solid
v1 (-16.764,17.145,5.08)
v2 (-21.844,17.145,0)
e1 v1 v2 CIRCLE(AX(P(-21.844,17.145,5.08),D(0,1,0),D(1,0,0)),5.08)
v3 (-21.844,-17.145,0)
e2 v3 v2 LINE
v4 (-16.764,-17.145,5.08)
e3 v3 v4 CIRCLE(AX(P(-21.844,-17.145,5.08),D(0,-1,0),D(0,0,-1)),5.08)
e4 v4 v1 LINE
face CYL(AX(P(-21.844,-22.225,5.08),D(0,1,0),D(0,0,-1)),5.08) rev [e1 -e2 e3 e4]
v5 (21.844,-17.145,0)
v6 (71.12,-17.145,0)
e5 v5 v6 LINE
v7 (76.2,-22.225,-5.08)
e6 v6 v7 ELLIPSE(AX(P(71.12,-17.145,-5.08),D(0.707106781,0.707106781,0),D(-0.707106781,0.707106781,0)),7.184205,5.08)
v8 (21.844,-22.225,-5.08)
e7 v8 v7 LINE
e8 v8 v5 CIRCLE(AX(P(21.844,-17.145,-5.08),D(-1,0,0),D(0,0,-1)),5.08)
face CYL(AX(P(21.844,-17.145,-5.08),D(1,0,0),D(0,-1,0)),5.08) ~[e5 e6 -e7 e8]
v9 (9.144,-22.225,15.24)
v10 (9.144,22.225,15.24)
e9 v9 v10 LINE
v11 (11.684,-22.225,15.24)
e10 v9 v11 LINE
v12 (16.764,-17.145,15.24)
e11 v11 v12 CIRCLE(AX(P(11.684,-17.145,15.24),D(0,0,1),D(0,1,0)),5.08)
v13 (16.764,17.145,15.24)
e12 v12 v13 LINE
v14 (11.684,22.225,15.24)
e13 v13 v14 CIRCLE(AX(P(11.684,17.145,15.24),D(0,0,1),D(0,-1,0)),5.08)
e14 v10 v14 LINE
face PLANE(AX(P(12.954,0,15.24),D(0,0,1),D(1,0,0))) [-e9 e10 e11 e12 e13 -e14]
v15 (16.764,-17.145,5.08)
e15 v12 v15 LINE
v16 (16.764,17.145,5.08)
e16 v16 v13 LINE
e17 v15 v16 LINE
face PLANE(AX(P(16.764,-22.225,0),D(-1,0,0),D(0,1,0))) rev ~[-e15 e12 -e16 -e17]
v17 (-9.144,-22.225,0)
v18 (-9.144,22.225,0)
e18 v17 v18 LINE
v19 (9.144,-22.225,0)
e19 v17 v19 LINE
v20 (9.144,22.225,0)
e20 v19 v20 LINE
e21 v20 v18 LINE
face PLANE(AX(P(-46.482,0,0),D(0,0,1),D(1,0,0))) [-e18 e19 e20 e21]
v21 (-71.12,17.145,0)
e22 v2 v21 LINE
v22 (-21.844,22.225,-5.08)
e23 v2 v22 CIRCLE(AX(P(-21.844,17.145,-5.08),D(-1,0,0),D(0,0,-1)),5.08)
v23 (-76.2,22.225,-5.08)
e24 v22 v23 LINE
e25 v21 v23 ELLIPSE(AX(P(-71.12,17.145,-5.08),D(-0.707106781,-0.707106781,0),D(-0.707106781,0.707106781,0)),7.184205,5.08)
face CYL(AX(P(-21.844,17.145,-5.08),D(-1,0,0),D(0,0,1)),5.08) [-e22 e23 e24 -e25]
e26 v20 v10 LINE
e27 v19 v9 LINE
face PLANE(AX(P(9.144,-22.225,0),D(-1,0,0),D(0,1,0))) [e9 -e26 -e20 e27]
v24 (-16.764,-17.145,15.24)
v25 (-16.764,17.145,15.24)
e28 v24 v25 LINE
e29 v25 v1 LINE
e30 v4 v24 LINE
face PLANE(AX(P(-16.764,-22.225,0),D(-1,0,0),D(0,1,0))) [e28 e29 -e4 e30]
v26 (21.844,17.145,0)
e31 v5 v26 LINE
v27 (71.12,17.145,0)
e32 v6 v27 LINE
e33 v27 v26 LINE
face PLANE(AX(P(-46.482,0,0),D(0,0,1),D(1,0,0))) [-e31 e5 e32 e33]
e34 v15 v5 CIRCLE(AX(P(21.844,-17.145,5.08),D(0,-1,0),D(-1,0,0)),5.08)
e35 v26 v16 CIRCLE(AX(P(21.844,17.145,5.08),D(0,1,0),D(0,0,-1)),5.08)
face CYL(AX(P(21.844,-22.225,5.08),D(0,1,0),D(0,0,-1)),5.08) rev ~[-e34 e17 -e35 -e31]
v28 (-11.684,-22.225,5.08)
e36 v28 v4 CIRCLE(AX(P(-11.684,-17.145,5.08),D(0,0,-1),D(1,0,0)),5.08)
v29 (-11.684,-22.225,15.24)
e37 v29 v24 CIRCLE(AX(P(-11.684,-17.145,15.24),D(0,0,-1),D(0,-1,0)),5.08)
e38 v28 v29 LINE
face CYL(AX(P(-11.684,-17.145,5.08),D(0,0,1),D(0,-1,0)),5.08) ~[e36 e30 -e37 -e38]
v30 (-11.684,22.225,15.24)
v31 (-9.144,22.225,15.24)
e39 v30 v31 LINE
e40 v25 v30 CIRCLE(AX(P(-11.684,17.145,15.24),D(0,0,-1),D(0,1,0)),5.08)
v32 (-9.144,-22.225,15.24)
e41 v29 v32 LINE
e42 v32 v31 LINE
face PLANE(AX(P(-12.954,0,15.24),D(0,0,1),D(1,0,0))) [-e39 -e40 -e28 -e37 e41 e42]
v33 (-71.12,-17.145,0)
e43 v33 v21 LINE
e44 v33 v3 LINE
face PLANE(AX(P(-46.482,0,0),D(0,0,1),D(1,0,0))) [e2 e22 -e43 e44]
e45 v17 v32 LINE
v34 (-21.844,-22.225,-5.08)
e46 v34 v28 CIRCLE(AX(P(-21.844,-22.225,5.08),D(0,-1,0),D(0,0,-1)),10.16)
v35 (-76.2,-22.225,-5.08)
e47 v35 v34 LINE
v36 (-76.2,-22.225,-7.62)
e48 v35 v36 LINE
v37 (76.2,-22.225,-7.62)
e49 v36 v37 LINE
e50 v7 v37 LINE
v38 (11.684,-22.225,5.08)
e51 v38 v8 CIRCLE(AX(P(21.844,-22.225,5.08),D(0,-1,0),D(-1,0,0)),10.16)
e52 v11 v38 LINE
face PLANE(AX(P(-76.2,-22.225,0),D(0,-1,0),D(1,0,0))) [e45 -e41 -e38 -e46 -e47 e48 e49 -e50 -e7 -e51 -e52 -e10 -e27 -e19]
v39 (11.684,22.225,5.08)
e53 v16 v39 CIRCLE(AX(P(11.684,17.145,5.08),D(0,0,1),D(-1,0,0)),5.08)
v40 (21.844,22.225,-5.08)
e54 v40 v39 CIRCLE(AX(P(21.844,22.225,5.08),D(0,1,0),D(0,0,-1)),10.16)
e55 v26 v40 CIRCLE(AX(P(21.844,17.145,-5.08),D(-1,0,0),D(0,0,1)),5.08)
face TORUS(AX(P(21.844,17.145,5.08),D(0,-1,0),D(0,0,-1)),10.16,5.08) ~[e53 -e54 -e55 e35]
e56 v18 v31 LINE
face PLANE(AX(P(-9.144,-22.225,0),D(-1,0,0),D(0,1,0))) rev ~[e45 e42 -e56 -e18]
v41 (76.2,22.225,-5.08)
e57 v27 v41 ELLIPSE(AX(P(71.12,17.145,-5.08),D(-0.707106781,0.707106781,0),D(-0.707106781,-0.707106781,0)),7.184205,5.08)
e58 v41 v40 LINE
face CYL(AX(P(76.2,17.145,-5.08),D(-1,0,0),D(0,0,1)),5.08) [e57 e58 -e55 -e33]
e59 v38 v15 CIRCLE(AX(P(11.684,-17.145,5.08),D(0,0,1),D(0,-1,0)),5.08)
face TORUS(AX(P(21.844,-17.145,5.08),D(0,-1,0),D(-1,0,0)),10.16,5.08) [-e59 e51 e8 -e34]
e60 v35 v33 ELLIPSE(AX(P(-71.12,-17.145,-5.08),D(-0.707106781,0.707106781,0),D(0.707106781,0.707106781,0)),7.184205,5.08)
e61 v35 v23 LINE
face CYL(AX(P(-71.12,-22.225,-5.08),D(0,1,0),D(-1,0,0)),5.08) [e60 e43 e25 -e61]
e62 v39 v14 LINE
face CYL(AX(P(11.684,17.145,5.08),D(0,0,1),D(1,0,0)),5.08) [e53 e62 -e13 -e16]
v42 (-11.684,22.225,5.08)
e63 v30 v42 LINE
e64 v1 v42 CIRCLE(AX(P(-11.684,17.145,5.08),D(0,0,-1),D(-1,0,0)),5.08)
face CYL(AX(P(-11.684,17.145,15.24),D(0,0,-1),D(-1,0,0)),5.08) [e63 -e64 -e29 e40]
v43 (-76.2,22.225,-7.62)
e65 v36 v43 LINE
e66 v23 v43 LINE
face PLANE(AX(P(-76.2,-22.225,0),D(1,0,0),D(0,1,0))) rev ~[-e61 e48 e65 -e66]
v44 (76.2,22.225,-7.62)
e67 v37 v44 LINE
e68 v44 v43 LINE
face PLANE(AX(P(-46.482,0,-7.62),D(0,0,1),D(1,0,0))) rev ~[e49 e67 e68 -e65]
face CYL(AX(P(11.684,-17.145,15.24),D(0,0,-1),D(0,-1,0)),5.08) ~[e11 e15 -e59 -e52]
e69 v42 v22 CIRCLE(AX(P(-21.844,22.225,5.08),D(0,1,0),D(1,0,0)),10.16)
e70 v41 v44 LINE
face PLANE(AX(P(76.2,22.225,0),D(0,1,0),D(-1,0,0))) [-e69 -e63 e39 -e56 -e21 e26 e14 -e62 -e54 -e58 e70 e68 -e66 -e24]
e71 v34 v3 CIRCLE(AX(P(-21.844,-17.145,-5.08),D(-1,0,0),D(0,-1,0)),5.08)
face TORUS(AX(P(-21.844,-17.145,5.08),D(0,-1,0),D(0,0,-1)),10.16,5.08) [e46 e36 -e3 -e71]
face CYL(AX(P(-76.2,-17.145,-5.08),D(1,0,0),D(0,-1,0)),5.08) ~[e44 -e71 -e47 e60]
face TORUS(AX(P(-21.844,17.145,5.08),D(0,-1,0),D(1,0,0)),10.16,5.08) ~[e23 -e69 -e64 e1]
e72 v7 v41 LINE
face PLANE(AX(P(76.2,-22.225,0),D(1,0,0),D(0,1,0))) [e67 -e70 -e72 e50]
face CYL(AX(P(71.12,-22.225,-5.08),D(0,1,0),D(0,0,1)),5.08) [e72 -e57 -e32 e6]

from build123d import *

# Parameters (mm, degrees)
F0_W     = 59.436
F0_H     = 44.45
F0_W_2   = 7.62
F0_W_3   = 18.288
F1_DEPTH = 7.62
F2_DEPTH = 15.24
F3_F1_R  = 5.08
F3_F2_R  = 5.08


with BuildPart() as f1:
    # F0 (on Top) → F1 (new body)
    with BuildSketch(Plane.XY):
        with Locations((-46.482, 0)):
            Rectangle(F0_W, F0_H)
        with Locations((-12.954, 0)):
            Rectangle(F0_W_2, F0_H)
        Rectangle(F0_W_3, F0_H)
        with Locations((12.954, 0)):
            Rectangle(F0_W_2, F0_H)
        with Locations((46.482, 0)):
            Rectangle(F0_W, F0_H)
    extrude(amount=-F1_DEPTH)

    # F0 (on Top) → F2 (join)
    with BuildSketch(Plane.XY):
        with Locations((-12.954, 0)):
            Rectangle(F0_W_2, F0_H)
        with Locations((12.954, 0)):
            Rectangle(F0_W_2, F0_H)
    extrude(amount=F2_DEPTH)

    # F3: fillet of radius 5.08 on 8 edges, made by hand

    # F3_f1
    f3_f1_edges = [f1.edges().sort_by_distance(p)[0] for p in [
        (16.764, 0, 0),
        (-16.764, 0, 0),
    ]]
    fillet(f3_f1_edges, radius=F3_F1_R)

    # F3_f2
    f3_f2_edges = [f1.edges().sort_by_distance(p)[0] for p in [
        (49.022, 22.225, 0),
        (76.2, 0, 0),
        (49.022, -22.225, 0),
        (-49.022, 22.225, 0),
        (-49.022, -22.225, 0),
        (-76.2, 0, 0),
        (-18.2518975516, -22.225, 1.4878975516),
        (-18.2518975516, 22.225, 1.4878975516),
        (18.2518975516, -22.225, 1.4878975516),
        (18.2518975516, 22.225, 1.4878975516),
    ]]
    fillet(f3_f2_edges, radius=F3_F2_R)


solid = f1.part
